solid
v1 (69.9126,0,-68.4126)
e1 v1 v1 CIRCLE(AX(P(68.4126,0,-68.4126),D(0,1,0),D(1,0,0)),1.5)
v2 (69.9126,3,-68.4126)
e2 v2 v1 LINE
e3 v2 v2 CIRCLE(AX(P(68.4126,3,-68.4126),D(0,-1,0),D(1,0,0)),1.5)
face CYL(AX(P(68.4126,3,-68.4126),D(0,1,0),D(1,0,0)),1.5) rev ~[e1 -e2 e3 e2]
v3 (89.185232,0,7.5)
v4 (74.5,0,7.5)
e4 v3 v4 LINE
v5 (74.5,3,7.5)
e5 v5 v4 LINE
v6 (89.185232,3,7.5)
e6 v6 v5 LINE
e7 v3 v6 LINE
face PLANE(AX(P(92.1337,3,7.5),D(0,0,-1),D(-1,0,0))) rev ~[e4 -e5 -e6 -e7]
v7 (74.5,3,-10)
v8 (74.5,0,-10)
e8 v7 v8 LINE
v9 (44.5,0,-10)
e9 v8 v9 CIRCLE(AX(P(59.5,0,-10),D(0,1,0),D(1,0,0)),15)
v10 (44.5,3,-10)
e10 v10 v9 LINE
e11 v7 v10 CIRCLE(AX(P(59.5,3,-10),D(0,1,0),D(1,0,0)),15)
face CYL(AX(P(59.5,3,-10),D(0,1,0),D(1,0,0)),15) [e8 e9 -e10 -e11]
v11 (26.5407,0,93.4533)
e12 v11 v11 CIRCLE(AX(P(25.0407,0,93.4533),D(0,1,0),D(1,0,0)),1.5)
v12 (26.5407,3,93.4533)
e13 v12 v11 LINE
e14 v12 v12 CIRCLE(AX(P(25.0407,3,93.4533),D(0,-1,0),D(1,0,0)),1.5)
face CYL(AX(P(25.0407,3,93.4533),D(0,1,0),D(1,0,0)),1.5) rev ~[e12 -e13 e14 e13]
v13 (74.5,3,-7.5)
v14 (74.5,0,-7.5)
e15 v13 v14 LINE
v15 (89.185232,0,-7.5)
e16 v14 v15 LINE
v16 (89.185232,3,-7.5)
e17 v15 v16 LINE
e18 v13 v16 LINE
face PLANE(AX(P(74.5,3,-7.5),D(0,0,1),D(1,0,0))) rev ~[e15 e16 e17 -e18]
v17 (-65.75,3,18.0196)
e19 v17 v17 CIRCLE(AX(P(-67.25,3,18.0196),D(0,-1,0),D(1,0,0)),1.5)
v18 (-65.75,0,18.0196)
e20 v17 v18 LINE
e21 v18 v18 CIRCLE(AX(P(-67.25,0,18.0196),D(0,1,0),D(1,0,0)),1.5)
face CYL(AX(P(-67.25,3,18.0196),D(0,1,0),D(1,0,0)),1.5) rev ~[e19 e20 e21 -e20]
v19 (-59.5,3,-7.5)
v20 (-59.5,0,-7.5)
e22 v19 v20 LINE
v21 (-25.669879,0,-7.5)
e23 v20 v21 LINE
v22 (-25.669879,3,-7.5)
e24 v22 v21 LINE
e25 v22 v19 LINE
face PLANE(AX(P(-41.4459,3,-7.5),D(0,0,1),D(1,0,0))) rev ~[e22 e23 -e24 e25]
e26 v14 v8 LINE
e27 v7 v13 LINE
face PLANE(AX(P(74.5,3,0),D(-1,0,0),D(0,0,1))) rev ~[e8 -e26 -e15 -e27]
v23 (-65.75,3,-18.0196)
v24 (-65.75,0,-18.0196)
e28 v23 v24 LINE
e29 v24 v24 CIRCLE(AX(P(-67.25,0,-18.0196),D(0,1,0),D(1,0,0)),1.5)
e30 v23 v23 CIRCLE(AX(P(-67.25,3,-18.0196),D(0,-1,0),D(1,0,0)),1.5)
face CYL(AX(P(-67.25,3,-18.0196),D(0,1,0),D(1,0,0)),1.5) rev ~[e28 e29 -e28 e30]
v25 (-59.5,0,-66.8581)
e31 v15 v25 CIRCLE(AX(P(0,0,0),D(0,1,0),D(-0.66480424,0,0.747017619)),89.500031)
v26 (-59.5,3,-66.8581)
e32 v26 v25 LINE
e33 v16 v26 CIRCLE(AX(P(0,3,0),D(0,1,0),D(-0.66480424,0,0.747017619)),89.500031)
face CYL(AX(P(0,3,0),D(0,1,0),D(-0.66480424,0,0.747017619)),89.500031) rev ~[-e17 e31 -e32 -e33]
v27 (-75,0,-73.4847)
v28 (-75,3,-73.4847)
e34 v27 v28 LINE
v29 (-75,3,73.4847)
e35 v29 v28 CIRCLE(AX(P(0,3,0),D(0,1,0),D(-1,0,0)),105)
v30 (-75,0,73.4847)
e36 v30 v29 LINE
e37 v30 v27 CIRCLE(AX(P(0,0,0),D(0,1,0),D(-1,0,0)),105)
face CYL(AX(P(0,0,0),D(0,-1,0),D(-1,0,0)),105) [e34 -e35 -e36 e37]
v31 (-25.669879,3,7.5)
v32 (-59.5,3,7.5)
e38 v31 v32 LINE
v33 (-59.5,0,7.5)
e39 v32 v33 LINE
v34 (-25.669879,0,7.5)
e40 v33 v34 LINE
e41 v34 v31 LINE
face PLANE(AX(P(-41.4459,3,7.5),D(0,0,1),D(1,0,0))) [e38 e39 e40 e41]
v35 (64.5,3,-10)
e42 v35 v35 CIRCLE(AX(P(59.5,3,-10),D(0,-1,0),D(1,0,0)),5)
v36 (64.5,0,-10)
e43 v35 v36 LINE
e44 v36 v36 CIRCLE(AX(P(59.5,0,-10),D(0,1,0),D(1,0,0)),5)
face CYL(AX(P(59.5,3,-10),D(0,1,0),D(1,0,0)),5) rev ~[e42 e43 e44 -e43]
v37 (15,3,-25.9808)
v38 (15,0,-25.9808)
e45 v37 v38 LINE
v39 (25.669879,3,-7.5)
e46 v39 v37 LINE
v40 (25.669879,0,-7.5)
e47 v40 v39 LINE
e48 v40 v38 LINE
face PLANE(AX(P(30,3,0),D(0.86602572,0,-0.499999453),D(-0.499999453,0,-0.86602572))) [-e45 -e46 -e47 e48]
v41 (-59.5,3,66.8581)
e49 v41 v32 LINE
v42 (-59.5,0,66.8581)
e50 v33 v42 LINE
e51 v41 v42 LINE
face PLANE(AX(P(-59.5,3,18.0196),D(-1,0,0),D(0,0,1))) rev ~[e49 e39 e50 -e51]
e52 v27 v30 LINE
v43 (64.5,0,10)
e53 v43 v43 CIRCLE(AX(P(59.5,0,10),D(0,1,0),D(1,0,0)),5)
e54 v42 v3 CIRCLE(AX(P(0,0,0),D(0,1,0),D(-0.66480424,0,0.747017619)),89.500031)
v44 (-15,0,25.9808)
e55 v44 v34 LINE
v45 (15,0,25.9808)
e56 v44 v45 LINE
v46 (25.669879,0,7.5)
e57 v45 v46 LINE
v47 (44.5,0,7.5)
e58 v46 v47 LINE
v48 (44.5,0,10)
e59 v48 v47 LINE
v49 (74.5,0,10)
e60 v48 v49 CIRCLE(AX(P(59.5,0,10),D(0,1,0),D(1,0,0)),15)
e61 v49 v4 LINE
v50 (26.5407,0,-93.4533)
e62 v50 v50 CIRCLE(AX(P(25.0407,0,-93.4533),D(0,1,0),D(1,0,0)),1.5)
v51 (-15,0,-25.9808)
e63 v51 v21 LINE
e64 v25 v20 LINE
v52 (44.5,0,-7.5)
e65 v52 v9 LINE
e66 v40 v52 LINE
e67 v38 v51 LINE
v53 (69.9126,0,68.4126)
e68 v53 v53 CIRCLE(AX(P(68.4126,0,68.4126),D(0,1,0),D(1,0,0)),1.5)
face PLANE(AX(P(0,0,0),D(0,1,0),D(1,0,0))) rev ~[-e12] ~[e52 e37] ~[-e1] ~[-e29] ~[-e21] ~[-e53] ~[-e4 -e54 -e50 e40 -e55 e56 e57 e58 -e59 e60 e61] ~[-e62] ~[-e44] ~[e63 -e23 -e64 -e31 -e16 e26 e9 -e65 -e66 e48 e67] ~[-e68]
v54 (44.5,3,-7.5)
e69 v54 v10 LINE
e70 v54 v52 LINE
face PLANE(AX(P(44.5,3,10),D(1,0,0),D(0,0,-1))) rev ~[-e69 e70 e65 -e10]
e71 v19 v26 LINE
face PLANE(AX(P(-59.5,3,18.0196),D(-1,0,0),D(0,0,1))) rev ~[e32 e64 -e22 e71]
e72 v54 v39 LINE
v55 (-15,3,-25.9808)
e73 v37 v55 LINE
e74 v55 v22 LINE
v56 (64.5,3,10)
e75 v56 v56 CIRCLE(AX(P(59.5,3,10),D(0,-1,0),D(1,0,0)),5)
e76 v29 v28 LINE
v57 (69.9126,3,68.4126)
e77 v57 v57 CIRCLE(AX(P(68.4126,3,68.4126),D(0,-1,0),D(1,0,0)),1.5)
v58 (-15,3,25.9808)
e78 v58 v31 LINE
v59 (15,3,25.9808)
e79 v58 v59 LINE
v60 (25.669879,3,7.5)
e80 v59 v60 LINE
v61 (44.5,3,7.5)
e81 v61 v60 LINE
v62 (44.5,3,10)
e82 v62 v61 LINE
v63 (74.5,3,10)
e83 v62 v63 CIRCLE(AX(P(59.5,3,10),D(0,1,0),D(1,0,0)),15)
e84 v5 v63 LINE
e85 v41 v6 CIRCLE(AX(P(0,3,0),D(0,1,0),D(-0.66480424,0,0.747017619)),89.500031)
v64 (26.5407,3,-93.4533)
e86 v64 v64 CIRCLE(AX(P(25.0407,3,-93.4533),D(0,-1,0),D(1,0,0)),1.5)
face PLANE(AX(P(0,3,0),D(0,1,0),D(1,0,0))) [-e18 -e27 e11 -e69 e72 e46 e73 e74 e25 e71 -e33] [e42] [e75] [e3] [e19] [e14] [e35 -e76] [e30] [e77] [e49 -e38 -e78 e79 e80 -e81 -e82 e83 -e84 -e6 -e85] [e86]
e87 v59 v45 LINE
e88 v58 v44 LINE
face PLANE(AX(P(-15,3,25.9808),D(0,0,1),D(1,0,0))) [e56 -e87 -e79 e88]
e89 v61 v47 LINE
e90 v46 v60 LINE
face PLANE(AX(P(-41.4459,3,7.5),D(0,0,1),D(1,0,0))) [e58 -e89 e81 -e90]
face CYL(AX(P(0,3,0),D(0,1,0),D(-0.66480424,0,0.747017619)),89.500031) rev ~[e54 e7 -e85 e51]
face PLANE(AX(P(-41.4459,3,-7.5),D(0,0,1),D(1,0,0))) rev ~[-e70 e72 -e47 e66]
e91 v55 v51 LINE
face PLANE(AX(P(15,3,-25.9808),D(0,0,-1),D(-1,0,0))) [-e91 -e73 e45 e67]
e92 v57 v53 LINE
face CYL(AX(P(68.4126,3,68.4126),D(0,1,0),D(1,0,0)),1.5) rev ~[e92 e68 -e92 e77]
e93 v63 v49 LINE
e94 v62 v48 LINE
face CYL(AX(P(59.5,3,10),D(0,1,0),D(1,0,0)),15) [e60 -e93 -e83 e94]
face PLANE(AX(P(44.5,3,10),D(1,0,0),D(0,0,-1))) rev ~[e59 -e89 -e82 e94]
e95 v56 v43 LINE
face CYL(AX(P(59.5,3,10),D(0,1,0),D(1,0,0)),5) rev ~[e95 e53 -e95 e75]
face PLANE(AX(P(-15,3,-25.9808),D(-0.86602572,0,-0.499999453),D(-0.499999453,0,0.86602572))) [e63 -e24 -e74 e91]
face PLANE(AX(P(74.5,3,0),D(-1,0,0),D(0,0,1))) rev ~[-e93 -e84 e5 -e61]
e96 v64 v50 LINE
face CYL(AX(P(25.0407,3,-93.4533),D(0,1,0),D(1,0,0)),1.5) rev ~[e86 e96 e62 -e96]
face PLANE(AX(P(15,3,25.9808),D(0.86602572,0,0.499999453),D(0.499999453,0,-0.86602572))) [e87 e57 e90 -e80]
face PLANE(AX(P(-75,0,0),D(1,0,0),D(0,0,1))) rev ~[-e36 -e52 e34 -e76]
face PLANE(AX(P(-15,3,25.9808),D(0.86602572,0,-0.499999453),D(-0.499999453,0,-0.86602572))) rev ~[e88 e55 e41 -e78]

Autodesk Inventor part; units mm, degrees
ref_plane "YZ Plane" through (0, 0, 0) normal (1, 0, 0) x (0, 1, 0)
ref_plane "XZ Plane" through (0, 0, 0) normal (0, 1, 0) x (-1, 0, 0)
ref_plane "XY Plane" through (0, 0, 0) normal (0, 0, 1) x (1, 0, 0)
sketch "Sketch1" plane through (0, 0, 0) normal (0, 1, 0) x (-1, 0, 0)
  circle A0 centre (0, 0) radius 105
  line L0 (105, 0) -> (75, 0)
  line L1 (75, 0) -> (75, -73.4847)
  line L2 (75, 0) -> (75, 73.4847)
  dimension "d0" = 210
  dimension "d1" = 30
extrude "Extrusion1" add sketch "Sketch1" along normal blind 3 contours L2 L1 A0
sketch "Sketch2" plane through (0, 3, 0) normal (0, 1, 0) x (1, 0, 0)
  line L0 (-75, 73.4847) -> (-75, -73.4847) projected
  line L1 (-75, 0) -> (-67.25, 0)
  line L2 (-67.25, 0) -> (-67.25, -52.6096)
  line L3 (-67.25, -52.6096) -> (-67.25, 59.9001)
  line L4 (0, 0) -> (-67.25, -18.0196)
  line L5 (0, 0) -> (69.6223, 0) construction
  line L6 (0, 0) -> (-67.25, 18.0196)
  line L7 (0, 0) -> (69.6223, 0) construction
  line L8 (0, 0) -> (25.0407, -93.4533)
  line L9 (0, 0) -> (96.75, 0) construction
  line L10 (0, 0) -> (68.4126, -68.4126)
  line L11 (0, 0) -> (96.75, 0) construction
  line L12 (0, 0) -> (25.0407, 93.4533)
  line L13 (0, 0) -> (96.75, 0) construction
  line L14 (0, 0) -> (68.4126, 68.4126)
  line L15 (0, 0) -> (96.75, 0) construction
  circle A0 centre (-67.25, 18.0196) radius 1.5
  circle A1 centre (-67.25, -18.0196) radius 1.5
  circle A2 centre (25.0407, 93.4533) radius 1.5
  circle A3 centre (68.4126, 68.4126) radius 1.5
  circle A4 centre (68.4126, -68.4126) radius 1.5
  circle A5 centre (25.0407, -93.4533) radius 1.5
  dimension "d4" = 7.75
  dimension "d5" = 165
  dimension "d6" = 165
  dimension "d7" = 96.75
  dimension "d8" = 75
  dimension "d9" = 96.75
  dimension "d10" = 45
  dimension "d11" = 96.75
  dimension "d12" = 75
  dimension "d13" = 96.75
  dimension "d14" = 45
  dimension "d15" = 3
  dimension "d16" = 3
  dimension "d17" = 3
  dimension "d18" = 3
  dimension "d19" = 3
  dimension "d20" = 3
extrude "Extrusion2" cut sketch "Sketch2" against normal blind 3 contours A1 L4 L2 | L2 A1 | A0 L3 | L3 L6 A0 | L4 A1 L2 | L3 A0 L6 | A2 | A3 | A4 | A5
sketch "Sketch3" plane through (0, 3, 0) normal (0, 1, 0) x (1, 0, 0)
  circle A0 centre (-67.25, -18.0196) radius 1.5 projected
  line L0 (-67.25, -18.0196) -> (-75, -18.0196)
  line L1 (-75, 73.4847) -> (-75, -73.4847) projected
  line L2 (-75, -18.0196) -> (-59.5, -18.0196)
  line L3 (-59.5, -18.0196) -> (-59.5, -66.8581)
  line L4 (-59.5, -18.0196) -> (-59.5, 66.8581)
  arc A1 (-59.5, -66.8581) -> (-59.5, 66.8581) centre (0, 0) ccw
  point P0 (0, 0)
  dimension "d23" = 15.5
extrude "Extrusion3" cut sketch "Sketch3" against normal blind 3 contours L4 A1 L3
sketch "Sketch4" plane through (0, 3, 0) normal (0, 1, 0) x (1, 0, 0)
  arc A0 (-59.5, -66.8581) -> (-59.5, 66.8581) centre (0, 0) ccw projected
  line L0 (89.5, 0) -> (59.5, 0)
  line L1 (59.5, 0) -> (59.5, 10)
  line L2 (59.5, 10) -> (59.5, -10)
  circle A1 centre (59.5, -10) radius 5
  circle A2 centre (59.5, 10) radius 5
  circle A3 centre (59.5, 10) radius 15
  circle A4 centre (59.5, -10) radius 15
  line L3 (44.5, -10) -> (44.5, 10)
  line L4 (74.5, 10) -> (74.5, -10)
  point P0 (0, 0)
  dimension "d27" = 30
  dimension "d28" = 10
  dimension "d29" = 20
  dimension "d30" = 10
  dimension "d31" = 10
extrude "Extrusion4" add sketch "Sketch4" against normal blind 3
sketch "Sketch5" plane through (0, 3, 0) normal (0, 1, 0) x (1, 0, 0)
  line L0 (44.5, -10) -> (44.5, 10) projected
  line L1 (44.5, 0) -> (-59.5, 0)
  line L2 (-59.5, 66.8581) -> (-59.5, -66.8581) projected
  line L3 (-41.4459, 0) -> (-41.4459, 7.5)
  line L4 (-41.4459, 7.5) -> (-41.4459, -7.5)
  line L5 (-41.4459, -7.5) -> (-59.5, -7.5)
  line L6 (-41.4459, -7.5) -> (44.5, -7.5)
  line L7 (-41.4459, 7.5) -> (-59.5, 7.5)
  line L8 (-41.4459, 7.5) -> (44.5, 7.5)
  point P0 (0, 0)
  dimension "d34" = 7.5
  dimension "d35" = 15
extrude "Extrusion5" add sketch "Sketch5" against normal blind 3 contours L1 L3 L8 L0 | L5 L2 L1 L4 | L1 L2 L7 L3
sketch "Sketch6" plane through (0, 3, 0) normal (0, 1, 0) x (1, 0, 0)
  line L0 (-41.4459, -7.5) -> (-41.4459, 0) projected
  line L1 (-41.4459, 0) -> (44.5, 0) projected
  line L2 (-41.4459, -7.5) -> (44.5, -7.5)
  line L3 (44.5, -7.5) -> (44.5, 0)
  line L4 (44.5, 0) -> (-41.4459, 0)
  line L5 (-41.4459, 0) -> (-41.4459, -7.5)
  point P0 (0, 0)
extrude "Extrusion6" add sketch "Sketch6" against normal blind 3
sketch "Sketch7" plane through (0, 3, 0) normal (0, 1, 0) x (1, 0, 0)
  line L0 (44.5, -7.5) -> (-59.5, -7.5) projected
  line L1 (74.5, 10) -> (74.5, -10) projected
  line L2 (44.5, -7.5) -> (74.5, -7.5)
  line L3 (74.5, -7.5) -> (74.5, 7.5)
  line L4 (74.5, 7.5) -> (44.5, 7.5)
  line L5 (44.5, 7.5) -> (44.5, -7.5)
  line L6 (74.5, 7.5) -> (92.1337, 7.5)
  line L7 (92.1337, 7.5) -> (92.1337, -7.5)
  line L8 (92.1337, -7.5) -> (74.5, -7.5)
  line L9 (74.5, -7.5) -> (74.5, 7.5)
  point P0 (0, 0)
  dimension "d40" = 15
extrude "Extrusion7" add sketch "Sketch7" against normal blind 3 contours L6 L7 L8 L1
sketch "Sketch8" plane through (0, 3, 0) normal (0, 1, 0) x (1, 0, 0)
  line L0 (0, 0) -> (-30, 0)
  line L1 (0, 0) -> (-15, 25.9808)
  line L2 (0, 0) -> (30, 0) construction
  line L3 (-15, 25.9808) -> (-30, 0)
  line L4 (0, 0) -> (15, 25.9808)
  line L5 (15, 25.9808) -> (-15, 25.9808)
  line L6 (0, 0) -> (30, 0)
  line L7 (30, 0) -> (15, 25.9808)
  line L8 (0, 0) -> (15, -25.9808)
  line L9 (15, -25.9808) -> (30, 0)
  line L10 (0, 0) -> (-15, -25.9808)
  line L11 (-15, -25.9808) -> (15, -25.9808)
  line L12 (-15, -25.9808) -> (-30, 0)
  dimension "d43" = 30
  dimension "d44" = 30
  dimension "d45" = 120
extrude "Extrusion8" add sketch "Sketch8" against normal blind 3 contours L10 L12 L0 | L0 L3 L1 | L4 L7 L6 | L6 L9 L8 | L8 L11 L10
sketch "Sketch9" plane through (0, 3, 0) normal (0, 1, 0) x (1, 0, 0)
  line L0 (4.3301, 7.5) -> (15, 25.9808) projected
  line L1 (-25.6699, 7.5) -> (-15, 25.9808) projected
  line L2 (15, 25.9808) -> (-15, 25.9808)
  line L3 (-15, 25.9808) -> (-4.3301, 7.5) projected
  line L4 (-15, 25.9808) -> (-4.3301, 7.5)
  line L5 (-4.3301, 7.5) -> (4.3988, 7.5)
  line L6 (-4.3301, 7.5) -> (4.3301, 7.5) projected
  line L7 (25.6699, 7.5) -> (15, 25.9808) projected
  line L8 (4.3301, 7.5) -> (15, 25.9808)
  point P0 (0, 0)
extrude "Extrusion9" add sketch "Sketch9" against normal blind 3
properties part number "Top Plate1"
